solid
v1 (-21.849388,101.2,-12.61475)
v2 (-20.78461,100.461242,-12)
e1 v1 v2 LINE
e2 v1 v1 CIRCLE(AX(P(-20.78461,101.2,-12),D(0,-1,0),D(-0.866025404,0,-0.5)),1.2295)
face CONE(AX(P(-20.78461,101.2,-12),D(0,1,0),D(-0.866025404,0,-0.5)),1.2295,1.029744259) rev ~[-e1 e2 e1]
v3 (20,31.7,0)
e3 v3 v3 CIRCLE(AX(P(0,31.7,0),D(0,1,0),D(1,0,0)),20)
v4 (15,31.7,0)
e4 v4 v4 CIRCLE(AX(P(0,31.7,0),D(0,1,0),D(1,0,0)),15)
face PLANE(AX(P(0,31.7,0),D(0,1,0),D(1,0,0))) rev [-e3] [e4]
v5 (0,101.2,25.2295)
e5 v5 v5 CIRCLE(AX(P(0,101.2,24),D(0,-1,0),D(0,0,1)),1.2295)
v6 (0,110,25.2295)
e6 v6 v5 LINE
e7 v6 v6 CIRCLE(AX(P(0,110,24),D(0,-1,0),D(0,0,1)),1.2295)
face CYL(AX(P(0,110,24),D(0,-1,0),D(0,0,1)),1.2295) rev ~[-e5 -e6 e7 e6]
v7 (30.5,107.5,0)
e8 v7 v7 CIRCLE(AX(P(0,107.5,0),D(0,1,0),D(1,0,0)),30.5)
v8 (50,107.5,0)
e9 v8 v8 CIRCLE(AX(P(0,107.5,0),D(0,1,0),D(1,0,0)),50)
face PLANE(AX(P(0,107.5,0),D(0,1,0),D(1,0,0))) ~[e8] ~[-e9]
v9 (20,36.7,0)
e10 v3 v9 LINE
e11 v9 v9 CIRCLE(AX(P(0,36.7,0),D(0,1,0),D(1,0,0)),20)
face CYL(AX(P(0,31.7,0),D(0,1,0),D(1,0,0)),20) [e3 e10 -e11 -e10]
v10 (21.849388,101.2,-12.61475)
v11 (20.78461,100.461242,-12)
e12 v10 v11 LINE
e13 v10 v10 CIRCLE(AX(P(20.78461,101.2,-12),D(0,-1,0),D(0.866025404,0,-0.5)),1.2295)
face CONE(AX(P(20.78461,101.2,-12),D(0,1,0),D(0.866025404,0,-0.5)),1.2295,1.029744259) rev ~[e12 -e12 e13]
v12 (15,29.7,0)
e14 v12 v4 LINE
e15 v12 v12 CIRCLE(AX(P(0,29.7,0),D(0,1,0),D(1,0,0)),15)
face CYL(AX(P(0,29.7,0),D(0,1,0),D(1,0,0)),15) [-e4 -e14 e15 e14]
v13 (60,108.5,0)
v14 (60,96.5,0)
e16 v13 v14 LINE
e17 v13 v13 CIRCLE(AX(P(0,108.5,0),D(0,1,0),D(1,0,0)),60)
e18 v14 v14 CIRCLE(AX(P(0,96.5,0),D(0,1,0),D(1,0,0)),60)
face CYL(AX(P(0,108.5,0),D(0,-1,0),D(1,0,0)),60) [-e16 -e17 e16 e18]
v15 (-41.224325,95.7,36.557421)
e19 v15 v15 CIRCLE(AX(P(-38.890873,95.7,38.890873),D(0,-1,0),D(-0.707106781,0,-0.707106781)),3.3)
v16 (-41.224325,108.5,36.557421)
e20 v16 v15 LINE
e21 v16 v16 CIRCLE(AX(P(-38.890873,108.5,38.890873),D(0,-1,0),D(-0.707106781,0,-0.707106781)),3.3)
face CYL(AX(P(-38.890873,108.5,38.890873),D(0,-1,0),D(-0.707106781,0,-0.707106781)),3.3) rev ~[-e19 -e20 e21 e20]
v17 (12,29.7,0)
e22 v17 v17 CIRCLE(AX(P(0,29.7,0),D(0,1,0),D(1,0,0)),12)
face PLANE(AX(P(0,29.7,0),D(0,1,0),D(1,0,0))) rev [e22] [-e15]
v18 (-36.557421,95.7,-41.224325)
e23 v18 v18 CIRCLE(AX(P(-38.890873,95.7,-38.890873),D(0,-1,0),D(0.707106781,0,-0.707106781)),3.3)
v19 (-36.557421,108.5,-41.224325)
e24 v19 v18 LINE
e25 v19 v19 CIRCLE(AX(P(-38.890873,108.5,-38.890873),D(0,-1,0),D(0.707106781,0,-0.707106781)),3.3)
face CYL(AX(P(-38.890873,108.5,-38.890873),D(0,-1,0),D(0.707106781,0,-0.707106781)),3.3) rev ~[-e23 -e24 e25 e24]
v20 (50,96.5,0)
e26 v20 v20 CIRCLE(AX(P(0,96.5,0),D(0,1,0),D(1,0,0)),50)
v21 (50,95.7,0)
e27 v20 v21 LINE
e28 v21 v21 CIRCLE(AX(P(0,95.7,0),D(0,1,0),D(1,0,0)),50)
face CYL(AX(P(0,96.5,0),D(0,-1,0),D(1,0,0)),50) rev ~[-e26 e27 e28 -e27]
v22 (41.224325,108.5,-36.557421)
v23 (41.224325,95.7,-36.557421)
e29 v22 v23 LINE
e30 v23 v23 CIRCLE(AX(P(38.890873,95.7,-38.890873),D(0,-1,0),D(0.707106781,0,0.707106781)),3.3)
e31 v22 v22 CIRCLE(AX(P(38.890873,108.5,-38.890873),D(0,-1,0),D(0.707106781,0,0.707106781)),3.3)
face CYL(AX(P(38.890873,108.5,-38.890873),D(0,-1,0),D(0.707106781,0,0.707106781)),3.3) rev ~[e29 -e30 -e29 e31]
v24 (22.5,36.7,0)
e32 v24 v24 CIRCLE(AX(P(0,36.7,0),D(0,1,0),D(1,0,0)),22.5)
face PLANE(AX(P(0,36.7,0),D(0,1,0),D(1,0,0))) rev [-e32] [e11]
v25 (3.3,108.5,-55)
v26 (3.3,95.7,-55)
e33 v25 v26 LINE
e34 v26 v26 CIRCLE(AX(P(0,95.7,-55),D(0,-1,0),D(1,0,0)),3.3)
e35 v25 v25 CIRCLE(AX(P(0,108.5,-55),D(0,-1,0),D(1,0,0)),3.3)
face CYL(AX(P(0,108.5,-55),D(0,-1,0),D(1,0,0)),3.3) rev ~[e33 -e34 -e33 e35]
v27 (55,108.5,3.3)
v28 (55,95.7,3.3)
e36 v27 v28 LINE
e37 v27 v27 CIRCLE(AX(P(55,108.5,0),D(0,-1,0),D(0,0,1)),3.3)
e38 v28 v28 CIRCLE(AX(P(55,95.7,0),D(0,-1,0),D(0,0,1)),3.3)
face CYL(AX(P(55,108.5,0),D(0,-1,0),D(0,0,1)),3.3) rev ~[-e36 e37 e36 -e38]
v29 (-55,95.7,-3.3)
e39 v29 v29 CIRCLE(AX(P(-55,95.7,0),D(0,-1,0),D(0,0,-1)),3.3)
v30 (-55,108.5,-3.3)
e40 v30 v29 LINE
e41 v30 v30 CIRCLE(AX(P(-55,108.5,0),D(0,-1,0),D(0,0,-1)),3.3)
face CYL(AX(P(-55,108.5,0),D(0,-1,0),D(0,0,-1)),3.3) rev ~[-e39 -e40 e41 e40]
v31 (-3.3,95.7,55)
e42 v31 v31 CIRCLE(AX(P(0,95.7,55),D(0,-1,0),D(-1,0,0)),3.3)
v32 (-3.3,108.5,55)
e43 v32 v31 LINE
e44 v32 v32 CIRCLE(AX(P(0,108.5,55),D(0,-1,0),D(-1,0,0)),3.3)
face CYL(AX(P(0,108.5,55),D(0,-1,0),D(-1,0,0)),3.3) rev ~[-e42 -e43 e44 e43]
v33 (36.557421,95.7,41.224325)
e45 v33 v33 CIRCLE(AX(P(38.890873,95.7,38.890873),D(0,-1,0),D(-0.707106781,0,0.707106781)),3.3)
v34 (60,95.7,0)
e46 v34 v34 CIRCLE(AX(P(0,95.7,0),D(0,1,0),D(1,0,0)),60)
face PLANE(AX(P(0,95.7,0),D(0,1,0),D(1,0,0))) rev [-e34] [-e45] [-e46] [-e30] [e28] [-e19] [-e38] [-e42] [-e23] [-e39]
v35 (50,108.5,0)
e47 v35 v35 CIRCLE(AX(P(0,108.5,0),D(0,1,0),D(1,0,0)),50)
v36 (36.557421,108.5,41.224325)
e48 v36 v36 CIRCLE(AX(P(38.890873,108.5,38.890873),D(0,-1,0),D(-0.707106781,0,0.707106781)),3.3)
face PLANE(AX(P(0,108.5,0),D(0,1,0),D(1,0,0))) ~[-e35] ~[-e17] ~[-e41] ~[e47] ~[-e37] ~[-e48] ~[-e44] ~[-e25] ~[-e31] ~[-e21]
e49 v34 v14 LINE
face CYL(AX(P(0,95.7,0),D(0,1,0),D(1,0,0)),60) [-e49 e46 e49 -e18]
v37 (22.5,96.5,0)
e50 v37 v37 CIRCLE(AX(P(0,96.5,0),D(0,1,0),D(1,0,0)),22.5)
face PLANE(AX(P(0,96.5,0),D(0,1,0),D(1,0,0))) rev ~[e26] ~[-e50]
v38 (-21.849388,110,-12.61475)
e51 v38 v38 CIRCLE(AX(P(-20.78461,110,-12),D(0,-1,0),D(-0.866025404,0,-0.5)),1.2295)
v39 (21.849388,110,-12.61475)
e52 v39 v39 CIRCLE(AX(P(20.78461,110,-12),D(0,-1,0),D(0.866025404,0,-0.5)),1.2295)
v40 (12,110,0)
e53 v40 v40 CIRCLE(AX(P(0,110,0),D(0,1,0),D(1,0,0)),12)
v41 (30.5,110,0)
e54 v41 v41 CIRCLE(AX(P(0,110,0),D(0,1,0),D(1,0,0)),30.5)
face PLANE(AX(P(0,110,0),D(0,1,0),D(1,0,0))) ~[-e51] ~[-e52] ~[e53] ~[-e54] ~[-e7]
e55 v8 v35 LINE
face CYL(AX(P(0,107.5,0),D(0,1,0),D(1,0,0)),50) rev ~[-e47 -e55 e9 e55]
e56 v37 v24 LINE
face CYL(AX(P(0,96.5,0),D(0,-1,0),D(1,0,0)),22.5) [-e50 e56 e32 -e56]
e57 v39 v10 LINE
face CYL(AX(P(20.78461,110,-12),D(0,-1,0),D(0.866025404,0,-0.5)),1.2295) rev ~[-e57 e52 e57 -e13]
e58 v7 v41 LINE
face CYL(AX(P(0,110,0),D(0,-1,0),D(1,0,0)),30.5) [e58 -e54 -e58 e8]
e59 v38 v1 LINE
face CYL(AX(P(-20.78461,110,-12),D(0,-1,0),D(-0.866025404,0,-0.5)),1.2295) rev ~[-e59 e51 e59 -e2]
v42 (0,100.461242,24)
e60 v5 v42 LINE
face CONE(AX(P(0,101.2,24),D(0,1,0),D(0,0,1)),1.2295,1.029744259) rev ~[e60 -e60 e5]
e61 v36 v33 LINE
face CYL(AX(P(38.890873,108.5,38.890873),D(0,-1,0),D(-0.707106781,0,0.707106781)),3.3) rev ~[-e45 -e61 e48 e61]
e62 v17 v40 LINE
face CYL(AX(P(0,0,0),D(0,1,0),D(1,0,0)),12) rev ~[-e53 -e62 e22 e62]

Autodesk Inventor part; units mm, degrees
ref_plane "YZ Plane" through (0, 0, 0) normal (1, 0, 0) x (0, 1, 0)
ref_plane "XZ Plane" through (0, 0, 0) normal (0, 1, 0) x (-1, 0, 0)
ref_plane "XY Plane" through (0, 0, 0) normal (0, 0, 1) x (1, 0, 0)
sketch "Sketch1" plane through (0, 0, 0) normal (0, 0, 1) x (1, 0, 0)
  line L0 (0, 0) -> (0, 20.5857) construction
  line L1 (12, 0) -> (12, 110)
  line L2 (12, 110) -> (30.5, 110)
  line L3 (30.5, 110) -> (30.5, 108.5)
  line L4 (30.5, 108.5) -> (60, 108.5)
  line L5 (60, 108.5) -> (60, 96.5)
  line L6 (60, 96.5) -> (22.5, 96.5)
  line L7 (22.5, 96.5) -> (22.5, 29.7)
  line L8 (22.5, 29.7) -> (14, 0)
  line L9 (14, 0) -> (12, 0)
  line L10 (30.5, 108.5) -> (30.5, 107.5)
  line L11 (30.5, 107.5) -> (50, 107.5)
  line L12 (50, 107.5) -> (50, 108.5)
  line L13 (50, 96.5) -> (50, 95.7)
  line L14 (50, 95.7) -> (60, 95.7)
  line L15 (60, 95.7) -> (60, 96.5)
  line L16 (12, 29.7) -> (15, 29.7)
  line L17 (15, 29.7) -> (15, 31.7)
  line L18 (15, 31.7) -> (20, 31.7)
  line L19 (20, 31.7) -> (20, 36.7)
  line L20 (20, 36.7) -> (22.5, 36.7)
  dimension "d36" = 110
  dimension "d38" = 24
  dimension "d39" = 28
  dimension "d40" = 45
  dimension "d41" = 1.5
  dimension "d42" = 12
  dimension "d43" = 120
  dimension "d44" = 61
  dimension "d56" = 1
  dimension "d57" = 100
  dimension "d58" = 0.8
  dimension "d77" = 30
  dimension "d78" = 40
  dimension "d79" = 2
  dimension "d80" = 5
  dimension "d83" = 2.5
  dimension "d87" = 59
revolve "Revolution1" add sketch "Sketch1" angle 360 about axis through (0, 0, 0) along (0, 1, 0) contours L1 L2 L3 L10 L11 L12 L4 L5 L6 L7 L20 L19 L18 L17 L16 | L6 L15 L14 L13
sketch "Sketch3" plane through (0, 108.5, 0) normal (0, 1, 0) x (1, 0, 0)
  point P0 (0, 0)
  point P1 (55, 0)
  dimension "d45" = 55
hole "Hole2" at (55, 108.5, 0) direction (0, -1, 0) diameter 6.6 end through all clearance for "Countersunk Flat Head Screw DIN EN ISO 2009" size "M6" standard "DIN"
pattern_circular "Circular Pattern2" count 8 over 360 about axis through (0, 102.1, 0) along (0, -1, 0) of "Hole2"
sketch "Sketch4" plane through (0, 110, 0) normal (0, 1, 0) x (1, 0, 0)
  point P0 (0, 0)
  point P1 (0, -24)
  dimension "d62" = 24
hole "Hole3" at (0, 110, 24) direction (0, -1, 0) diameter 2.459 depth 8.8 tip angle 118 thread size "M3x0.5" class "6H" standard "ISO Metric profile"
pattern_circular "Circular Pattern3" count 3 over 360 about axis through (0, 102.1, 0) along (0, -1, 0) of "Hole3"
thread "Thread4" size "M40x1.5" class "6g" standard "ISO Metric profile" length 10
properties part number "005" material "Stainless Steel, 440C"
